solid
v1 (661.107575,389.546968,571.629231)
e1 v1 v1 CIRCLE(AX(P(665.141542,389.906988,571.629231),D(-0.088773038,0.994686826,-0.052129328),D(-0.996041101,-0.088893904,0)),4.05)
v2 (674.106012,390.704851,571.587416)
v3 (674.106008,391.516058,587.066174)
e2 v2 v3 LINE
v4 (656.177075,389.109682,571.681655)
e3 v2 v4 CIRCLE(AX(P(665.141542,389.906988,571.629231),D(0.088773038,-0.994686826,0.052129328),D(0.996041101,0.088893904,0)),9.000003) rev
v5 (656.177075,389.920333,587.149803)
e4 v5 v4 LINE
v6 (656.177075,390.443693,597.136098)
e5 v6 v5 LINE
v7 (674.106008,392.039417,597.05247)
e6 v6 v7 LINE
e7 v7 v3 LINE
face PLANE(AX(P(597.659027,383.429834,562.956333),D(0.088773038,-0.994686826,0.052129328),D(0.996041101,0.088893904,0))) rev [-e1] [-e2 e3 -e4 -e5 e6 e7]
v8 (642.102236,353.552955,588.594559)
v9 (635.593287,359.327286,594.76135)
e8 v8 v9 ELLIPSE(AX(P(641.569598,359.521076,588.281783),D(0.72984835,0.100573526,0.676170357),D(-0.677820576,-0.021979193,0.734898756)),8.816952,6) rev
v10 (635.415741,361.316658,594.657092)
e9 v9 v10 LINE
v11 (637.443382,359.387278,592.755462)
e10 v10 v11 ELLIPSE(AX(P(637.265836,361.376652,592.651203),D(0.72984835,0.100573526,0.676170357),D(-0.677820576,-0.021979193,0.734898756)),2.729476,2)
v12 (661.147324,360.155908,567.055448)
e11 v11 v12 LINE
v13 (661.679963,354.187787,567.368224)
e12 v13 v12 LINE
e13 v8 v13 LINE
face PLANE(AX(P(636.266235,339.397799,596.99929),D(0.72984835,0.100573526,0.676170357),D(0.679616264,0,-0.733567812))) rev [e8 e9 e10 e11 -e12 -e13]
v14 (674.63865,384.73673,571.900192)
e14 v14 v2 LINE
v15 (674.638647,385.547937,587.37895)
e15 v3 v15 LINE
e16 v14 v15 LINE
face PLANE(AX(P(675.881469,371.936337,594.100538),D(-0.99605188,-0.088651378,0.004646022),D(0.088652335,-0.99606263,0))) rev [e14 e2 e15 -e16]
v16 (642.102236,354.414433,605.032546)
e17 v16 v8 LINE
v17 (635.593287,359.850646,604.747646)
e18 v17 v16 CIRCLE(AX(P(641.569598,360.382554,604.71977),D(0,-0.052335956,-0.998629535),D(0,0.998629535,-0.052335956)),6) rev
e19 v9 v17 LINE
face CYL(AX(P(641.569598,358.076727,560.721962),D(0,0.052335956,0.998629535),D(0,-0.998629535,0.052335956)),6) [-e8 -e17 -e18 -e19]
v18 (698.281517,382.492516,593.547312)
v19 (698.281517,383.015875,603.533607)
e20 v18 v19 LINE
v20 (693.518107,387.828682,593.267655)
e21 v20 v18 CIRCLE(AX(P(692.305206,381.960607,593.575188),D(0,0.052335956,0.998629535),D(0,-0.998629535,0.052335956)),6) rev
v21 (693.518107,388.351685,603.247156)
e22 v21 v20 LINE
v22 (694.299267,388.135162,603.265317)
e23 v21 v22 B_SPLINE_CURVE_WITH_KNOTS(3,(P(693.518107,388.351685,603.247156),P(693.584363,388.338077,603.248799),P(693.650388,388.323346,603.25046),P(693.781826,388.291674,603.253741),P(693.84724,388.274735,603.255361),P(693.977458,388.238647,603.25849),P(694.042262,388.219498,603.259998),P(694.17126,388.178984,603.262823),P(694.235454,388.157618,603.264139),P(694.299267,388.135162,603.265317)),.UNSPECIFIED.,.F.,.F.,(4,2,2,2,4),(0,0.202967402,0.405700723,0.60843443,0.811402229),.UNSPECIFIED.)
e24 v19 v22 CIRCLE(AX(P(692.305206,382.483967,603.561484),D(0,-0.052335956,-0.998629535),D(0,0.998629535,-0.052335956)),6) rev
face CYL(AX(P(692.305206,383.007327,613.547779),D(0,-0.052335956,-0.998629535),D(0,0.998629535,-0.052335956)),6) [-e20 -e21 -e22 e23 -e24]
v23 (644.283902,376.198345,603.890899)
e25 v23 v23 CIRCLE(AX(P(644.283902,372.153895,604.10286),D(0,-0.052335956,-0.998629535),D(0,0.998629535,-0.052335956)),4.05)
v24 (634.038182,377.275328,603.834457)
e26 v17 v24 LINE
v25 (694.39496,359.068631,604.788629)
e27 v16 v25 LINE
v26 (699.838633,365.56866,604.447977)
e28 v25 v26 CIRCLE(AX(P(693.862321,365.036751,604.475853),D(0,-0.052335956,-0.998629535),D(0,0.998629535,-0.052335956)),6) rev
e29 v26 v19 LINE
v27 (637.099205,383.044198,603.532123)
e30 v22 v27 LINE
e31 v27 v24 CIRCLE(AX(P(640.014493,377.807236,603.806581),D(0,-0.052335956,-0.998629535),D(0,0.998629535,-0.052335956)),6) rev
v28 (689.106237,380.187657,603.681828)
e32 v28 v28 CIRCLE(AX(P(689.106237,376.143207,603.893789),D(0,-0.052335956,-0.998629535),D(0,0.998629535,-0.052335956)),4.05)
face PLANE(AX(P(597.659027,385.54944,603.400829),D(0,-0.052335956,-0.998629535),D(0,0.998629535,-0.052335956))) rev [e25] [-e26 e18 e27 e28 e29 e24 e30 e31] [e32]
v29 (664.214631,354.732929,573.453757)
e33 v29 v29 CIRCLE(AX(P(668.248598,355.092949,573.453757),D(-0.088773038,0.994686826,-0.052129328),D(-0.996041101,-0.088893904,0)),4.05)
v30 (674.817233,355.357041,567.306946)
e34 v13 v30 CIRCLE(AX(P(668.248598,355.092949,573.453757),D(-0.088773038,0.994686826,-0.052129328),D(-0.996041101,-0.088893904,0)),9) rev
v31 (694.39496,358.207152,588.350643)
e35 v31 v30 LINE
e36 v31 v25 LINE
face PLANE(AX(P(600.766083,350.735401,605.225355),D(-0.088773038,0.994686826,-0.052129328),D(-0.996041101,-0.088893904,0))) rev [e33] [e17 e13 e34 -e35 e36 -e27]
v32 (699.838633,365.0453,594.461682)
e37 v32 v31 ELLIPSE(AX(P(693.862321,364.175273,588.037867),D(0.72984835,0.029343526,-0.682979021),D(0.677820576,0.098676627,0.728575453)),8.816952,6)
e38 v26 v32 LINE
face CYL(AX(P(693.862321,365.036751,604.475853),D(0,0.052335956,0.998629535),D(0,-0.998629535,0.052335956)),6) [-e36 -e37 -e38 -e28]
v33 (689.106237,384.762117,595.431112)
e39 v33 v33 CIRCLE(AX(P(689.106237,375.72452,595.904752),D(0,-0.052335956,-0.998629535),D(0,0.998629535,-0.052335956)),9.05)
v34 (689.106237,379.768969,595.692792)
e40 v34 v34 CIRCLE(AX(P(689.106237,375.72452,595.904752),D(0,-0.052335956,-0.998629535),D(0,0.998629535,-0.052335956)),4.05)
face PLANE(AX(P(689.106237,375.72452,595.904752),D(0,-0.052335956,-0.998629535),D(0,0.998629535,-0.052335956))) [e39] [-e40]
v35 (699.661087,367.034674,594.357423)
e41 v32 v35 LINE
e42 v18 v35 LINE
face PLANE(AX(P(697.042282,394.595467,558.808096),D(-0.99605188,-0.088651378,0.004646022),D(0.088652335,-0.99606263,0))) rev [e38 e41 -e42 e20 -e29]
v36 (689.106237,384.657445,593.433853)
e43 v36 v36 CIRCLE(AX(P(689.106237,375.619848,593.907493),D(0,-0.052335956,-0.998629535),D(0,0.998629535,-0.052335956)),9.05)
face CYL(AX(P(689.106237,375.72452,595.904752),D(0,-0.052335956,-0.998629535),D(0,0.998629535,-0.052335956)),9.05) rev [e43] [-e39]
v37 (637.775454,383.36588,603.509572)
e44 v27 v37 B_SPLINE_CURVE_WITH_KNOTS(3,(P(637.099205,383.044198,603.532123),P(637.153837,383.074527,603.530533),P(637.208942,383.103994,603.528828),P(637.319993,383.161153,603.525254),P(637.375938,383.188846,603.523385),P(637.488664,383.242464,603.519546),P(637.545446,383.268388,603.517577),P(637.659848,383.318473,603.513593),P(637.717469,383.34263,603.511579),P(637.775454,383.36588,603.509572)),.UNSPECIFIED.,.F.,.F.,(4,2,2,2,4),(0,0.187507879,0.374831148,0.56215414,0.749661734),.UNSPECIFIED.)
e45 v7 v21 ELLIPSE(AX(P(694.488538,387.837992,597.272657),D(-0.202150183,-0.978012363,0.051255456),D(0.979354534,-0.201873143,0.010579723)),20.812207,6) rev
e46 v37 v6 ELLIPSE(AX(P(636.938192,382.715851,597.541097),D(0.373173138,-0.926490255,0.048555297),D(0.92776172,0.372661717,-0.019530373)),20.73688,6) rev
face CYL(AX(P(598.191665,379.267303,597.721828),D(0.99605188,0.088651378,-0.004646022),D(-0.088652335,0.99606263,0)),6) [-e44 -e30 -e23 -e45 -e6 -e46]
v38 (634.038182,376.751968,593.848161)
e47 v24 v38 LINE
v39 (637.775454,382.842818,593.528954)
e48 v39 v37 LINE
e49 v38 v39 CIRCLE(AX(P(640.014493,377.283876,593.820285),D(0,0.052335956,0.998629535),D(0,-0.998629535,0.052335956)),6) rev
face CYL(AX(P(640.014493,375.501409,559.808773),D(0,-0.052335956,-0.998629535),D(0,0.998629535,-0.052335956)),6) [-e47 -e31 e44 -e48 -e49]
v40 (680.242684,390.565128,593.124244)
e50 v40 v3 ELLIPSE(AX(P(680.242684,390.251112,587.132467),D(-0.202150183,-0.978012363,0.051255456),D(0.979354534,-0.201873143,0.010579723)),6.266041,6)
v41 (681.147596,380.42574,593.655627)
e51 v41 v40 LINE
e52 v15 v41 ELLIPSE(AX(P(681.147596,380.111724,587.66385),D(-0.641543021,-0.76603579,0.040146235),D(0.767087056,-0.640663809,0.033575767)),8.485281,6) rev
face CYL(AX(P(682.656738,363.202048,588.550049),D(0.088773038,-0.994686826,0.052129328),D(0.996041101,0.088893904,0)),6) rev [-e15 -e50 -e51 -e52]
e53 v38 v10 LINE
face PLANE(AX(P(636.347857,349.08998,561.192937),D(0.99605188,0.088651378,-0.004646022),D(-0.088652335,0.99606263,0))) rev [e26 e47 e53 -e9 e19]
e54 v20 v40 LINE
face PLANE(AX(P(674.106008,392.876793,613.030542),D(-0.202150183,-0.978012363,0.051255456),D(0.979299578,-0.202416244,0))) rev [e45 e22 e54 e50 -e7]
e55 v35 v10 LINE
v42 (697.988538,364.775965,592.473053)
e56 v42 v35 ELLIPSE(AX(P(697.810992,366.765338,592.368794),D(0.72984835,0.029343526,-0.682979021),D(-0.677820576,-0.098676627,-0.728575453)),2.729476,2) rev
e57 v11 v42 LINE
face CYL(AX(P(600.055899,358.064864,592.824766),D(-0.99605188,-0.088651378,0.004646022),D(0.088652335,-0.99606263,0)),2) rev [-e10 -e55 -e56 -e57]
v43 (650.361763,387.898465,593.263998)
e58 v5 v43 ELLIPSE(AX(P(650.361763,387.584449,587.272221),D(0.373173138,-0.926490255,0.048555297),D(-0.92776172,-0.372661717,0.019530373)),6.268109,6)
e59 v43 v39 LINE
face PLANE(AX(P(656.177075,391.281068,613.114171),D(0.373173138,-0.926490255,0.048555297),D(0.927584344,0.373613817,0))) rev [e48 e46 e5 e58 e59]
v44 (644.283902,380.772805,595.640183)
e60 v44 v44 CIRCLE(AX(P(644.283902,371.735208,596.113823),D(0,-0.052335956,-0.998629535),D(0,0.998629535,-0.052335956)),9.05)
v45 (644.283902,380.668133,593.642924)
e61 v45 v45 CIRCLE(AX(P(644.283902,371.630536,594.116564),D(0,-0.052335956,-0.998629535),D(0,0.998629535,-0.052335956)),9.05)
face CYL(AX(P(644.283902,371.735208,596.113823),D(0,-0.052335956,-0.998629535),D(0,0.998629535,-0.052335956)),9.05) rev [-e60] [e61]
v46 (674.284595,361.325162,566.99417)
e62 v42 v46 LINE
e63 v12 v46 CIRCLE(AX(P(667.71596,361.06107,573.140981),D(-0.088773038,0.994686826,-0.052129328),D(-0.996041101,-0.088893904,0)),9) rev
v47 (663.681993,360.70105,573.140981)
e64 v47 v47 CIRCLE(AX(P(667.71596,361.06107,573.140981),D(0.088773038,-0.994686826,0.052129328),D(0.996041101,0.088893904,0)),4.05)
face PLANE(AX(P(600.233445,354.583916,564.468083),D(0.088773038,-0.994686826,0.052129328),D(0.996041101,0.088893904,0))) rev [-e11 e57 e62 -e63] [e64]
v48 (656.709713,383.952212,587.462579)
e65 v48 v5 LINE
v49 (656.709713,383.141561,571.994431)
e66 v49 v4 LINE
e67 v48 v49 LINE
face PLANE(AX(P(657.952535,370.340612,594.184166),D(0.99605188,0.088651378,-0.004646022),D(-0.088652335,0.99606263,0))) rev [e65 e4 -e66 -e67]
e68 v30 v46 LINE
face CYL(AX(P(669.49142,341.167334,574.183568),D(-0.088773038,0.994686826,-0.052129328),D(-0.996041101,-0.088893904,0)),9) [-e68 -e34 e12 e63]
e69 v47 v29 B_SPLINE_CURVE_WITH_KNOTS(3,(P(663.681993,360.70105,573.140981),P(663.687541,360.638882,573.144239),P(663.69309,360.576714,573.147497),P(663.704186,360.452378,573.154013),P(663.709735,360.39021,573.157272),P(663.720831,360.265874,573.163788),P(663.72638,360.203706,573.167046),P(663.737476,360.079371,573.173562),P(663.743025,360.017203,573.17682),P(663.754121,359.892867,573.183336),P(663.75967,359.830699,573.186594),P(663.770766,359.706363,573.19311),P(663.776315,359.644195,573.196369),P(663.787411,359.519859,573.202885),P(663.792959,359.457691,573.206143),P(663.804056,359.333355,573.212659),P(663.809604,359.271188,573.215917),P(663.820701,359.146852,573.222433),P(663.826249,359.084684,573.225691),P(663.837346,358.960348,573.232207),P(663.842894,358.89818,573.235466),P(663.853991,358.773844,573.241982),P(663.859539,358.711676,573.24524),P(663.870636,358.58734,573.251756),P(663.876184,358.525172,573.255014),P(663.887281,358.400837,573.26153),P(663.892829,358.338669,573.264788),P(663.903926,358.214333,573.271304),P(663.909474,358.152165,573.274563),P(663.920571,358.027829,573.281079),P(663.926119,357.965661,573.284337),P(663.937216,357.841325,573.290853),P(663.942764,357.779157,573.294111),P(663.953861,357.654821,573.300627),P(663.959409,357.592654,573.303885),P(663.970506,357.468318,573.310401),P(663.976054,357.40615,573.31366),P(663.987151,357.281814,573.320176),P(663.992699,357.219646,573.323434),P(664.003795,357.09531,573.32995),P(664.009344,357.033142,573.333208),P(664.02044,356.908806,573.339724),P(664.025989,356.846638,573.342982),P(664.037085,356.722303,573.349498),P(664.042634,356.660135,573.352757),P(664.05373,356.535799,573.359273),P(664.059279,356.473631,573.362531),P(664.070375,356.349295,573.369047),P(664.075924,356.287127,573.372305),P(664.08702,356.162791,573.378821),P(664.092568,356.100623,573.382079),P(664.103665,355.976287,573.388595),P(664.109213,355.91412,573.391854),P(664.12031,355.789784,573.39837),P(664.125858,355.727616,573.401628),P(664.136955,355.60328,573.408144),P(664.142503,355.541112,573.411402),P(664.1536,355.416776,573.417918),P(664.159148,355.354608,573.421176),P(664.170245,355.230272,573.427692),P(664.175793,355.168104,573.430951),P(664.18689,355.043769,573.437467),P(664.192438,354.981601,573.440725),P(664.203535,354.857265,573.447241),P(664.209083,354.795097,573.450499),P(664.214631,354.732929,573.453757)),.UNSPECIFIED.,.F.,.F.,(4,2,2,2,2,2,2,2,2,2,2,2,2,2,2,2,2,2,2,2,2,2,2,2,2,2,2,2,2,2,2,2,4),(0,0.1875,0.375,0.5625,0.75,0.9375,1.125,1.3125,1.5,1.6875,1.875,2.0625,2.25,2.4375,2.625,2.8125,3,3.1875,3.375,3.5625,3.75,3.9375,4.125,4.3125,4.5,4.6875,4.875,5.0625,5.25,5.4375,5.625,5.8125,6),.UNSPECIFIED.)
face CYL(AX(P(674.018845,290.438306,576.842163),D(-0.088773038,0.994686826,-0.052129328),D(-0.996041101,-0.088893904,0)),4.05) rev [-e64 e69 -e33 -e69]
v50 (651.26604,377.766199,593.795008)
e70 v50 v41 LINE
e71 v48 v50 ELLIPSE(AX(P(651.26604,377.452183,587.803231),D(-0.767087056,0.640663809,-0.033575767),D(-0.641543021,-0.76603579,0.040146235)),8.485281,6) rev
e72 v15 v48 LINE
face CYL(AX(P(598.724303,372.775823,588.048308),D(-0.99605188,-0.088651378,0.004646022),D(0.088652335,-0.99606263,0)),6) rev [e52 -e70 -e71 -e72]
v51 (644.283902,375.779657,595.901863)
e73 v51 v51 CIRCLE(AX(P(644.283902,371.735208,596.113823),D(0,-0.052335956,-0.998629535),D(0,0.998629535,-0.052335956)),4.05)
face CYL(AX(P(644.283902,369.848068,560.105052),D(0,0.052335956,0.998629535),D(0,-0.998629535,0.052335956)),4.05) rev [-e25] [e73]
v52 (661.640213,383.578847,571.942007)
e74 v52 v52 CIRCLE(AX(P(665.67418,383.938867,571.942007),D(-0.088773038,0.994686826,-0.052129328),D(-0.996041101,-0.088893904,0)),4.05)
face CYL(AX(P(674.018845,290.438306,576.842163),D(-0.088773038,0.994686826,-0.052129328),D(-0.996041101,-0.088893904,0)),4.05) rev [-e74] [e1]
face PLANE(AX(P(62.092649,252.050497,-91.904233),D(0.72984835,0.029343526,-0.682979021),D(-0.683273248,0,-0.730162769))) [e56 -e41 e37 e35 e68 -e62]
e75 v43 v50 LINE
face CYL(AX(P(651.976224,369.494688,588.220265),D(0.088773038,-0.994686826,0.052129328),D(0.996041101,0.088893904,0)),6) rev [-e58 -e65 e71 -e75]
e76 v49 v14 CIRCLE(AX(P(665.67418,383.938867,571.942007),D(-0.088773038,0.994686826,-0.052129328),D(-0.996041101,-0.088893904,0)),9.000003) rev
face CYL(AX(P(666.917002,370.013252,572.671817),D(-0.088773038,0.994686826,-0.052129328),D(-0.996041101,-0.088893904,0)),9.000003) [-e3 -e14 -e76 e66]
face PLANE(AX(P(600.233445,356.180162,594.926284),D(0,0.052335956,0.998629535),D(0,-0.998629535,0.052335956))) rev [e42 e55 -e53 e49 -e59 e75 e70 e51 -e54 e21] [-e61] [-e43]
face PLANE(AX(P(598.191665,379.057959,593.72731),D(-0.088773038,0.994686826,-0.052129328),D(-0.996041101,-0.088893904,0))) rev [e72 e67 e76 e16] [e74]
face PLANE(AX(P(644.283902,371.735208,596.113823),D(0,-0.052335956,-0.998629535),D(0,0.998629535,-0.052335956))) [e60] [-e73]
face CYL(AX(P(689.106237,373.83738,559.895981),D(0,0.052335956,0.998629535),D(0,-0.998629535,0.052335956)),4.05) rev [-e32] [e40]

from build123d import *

# Parameters (mm, degrees)
SKETCH_2_R          = 4.050000000000024
EXTRUDE_1_DEPTH     = 50
CUT_EXTRUDE_1_DEPTH = 100
CUT_EXTRUDE_2_DEPTH = 100
SKETCH_7_R          = 4.050000000000008
CUT_EXTRUDE_3_DEPTH = 100
CUT_EXTRUDE_6_DEPTH = 20
CUT_EXTRUDE_7_DEPTH = 20
CUT_EXTRUDE_8_DEPTH = 20
FILLET_1_R          = 6
FILLET_2_R          = 2
FILLET_3_R          = 6
FILLET_4_R          = 6
SKETCH_13_R         = 9.049999999999946
CUT_EXTRUDE_9_DEPTH = 2


with BuildPart() as part:
    # ｽｹｯﾁ2 → ﾎﾞｽ - 押し出し1 (new body)
    with BuildSketch(Plane(origin=(-3.9916e-13, 32.90329120575703, 627.8321969731651), x_dir=(-1, -3e-17, -6.3e-16), z_dir=(0, -0.05233595624294474, -0.9986295347545739))):
        Polygon((-697.0422820628135, 364.8089319187604), (-700.5932035956617, 324.9668567184454), (-636.3478573351539, 319.2409957467275), (-632.7969358023056, 359.08307094704253), align=None)
        with Locations(Location((-644.2839023988065, 340.0275704705168, 0), (0, 0, 90))):
            Circle(SKETCH_2_R, mode=Mode.SUBTRACT)
        with Locations(Location((-689.106236999161, 344.02235719497116, 0), (0, 0, 90))):
            Circle(SKETCH_2_R, mode=Mode.SUBTRACT)
    extrude(amount=EXTRUDE_1_DEPTH)

    # ｽｹｯﾁ5 → ｶｯﾄ - 押し出し1 (cut)
    with BuildSketch(Plane(origin=(723.8064708248907, 64.42078199043551, -3.3761501237952602), x_dir=(-0.004627728743617884, -0.0004118806842991107, -0.9999892071822463), z_dir=(0.9960518800078746, 0.08865137795745748, -0.004646021849131346))):
        Polygon((-608.1434669406992, 296.09511014614947), (-567.6985342683519, 293.98384959158335), (-567.3857549269345, 299.9756914689684), (-597.8442844703076, 301.56565312117255), (-596.645296994875, 324.5343803178144), (-566.186767451502, 322.9444186656103), (-565.8739881100848, 328.9362605429951), (-606.3189207824322, 331.0475210975612), (-626.0453368448235, 332.0772571204365), (-625.4050029902406, 344.3439854408341), (-551.5560275003857, 340.4890048871531), (-554.6576307812425, 281.07230447123857), (-628.5066062710979, 284.92728502491957), (-628.5066062710974, 296.97977053027586), align=None)
    extrude(amount=-CUT_EXTRUDE_1_DEPTH, mode=Mode.SUBTRACT)

    # ｽｹｯﾁ6 → ｶｯﾄ - 押し出し2 (cut)
    with BuildSketch(Plane(origin=(723.8064708248907, 64.42078199043551, -3.3761501237952602), x_dir=(-0.004627728743617884, -0.0004118806842991107, -0.9999892071822463), z_dir=(0.9960518800078746, 0.08865137795745748, -0.004646021849131346))):
        Polygon((-606.3189207824322, 331.04752109756123), (-608.1434669406992, 296.0951101461494), (-619.732969083748, 290.9532658931082), (-617.724208131906, 336.87839675393917), align=None)
    extrude(amount=-CUT_EXTRUDE_2_DEPTH, mode=Mode.SUBTRACT)

    # ｽｹｯﾁ7 → ｶｯﾄ - 押し出し3 (cut)
    with BuildSketch(Plane(origin=(-26.542256166274278, 297.4014749020998, -15.586150855120477), x_dir=(0.9960518800078747, 0.0886513779574575, -0.004646021849131969), z_dir=(-0.0887730383212076, 0.9946868255236824, -0.05212932760779488))):
        with Locations(Location((694.4254727867873, -591.2519877036084, 0), (0, 0, 179.733439165))):
            Circle(SKETCH_7_R)
    extrude(amount=-CUT_EXTRUDE_3_DEPTH, mode=Mode.SUBTRACT)

    # ｽｹｯﾁ8 → ｶｯﾄ - 押し出し6 (cut)
    with BuildSketch(Plane(origin=(-26.542256166274278, 297.4014749020998, -15.586150855120477), x_dir=(0.9960518800078747, 0.0886513779574575, -0.004646021849131969), z_dir=(-0.0887730383212076, 0.9946868255236824, -0.05212932760779488))):
        with BuildLine():
            Line((653.0837968072778, -612.7519877036083), (685.4254727867873, -612.7519877036083))
            Line((685.4254727867873, -612.7519877036083), (685.4254727867873, -591.2626120432828))
            ThreePointArc((685.4254727867873, -591.2626120432828), (694.420160616025, -582.2519830004186), (703.4254727867874, -591.2519877036085))
            Line((703.4254727867874, -591.2519877036085), (703.4254727867874, -612.7519877036083))
            Line((703.4254727867874, -612.7519877036083), (732.6544524188718, -612.7519877036083))
            Line((732.6544524188718, -612.7519877036083), (732.6544524188718, -571.4472878962366))
            Line((732.6544524188718, -571.4472878962366), (653.0837968072778, -571.4472878962366))
            Line((653.0837968072778, -571.4472878962366), (653.0837968072778, -612.7519877036083))
        make_face()
    extrude(amount=-CUT_EXTRUDE_6_DEPTH, mode=Mode.SUBTRACT)

    # ｽｹｯﾁ9 → ｶｯﾄ - 押し出し7 (cut)
    with BuildSketch(Plane(origin=(-23.96783805495928, 268.5555569619133, -14.074400354494276), x_dir=(0.9960518800078746, 0.08865137795745749, -0.0046460218491326), z_dir=(-0.08877303832120763, 0.994686825523682, -0.052129327607802006))):
        with BuildLine():
            Line((701.0201444957777, -585.1274220005872), (726.6754727867866, -612.7519877036101))
            Line((726.6754727867866, -612.7519877036101), (726.6754727867866, -582.25198770361))
            Line((726.6754727867866, -582.25198770361), (694.4254732410474, -582.25198770361))
            ThreePointArc((694.4254732410474, -582.2519877036095), (698.0226182987518, -583.0021062398702), (701.0201444957777, -585.1274220005872))
        make_face()
        with BuildLine():
            ThreePointArc((687.8308010777955, -585.1274220005871), (690.8283276912211, -583.0021060583099), (694.4254732410474, -582.2519877036095))
            Line((694.4254732410474, -582.25198770361), (662.1754727867867, -582.25198770361))
            Line((662.1754727867867, -582.25198770361), (662.1754727867866, -612.7519877036101))
            Line((662.1754727867866, -612.7519877036101), (687.8308010777955, -585.1274220005871))
        make_face()
    extrude(amount=-CUT_EXTRUDE_7_DEPTH, mode=Mode.SUBTRACT)

    # ｽｹｯﾁ10 → ｶｯﾄ - 押し出し8 (cut)
    with BuildSketch(Plane(origin=(-4.2186e-13, 32.06896121623387, 611.9122324003949), x_dir=(-1, -4e-17, -7.1e-16), z_dir=(0, -0.05233595624294566, -0.9986295347545738))):
        Polygon((-674.1060084484338, 360.25482907777223), (-697.885625926865, 355.3464390586851), (-697.2642146586165, 362.31880221874025), align=None)
        Polygon((-656.177074608292, 358.65691438799047), (-633.6427427973452, 349.59294124702217), (-633.0188683981086, 356.5929412470222), align=None)
    extrude(amount=-CUT_EXTRUDE_8_DEPTH, mode=Mode.SUBTRACT)

    # ﾌｨﾚｯﾄ1
    fillet_1_edges = [part.edges().sort_by_distance(p)[0] for p in [
        (700.3712709998582, 359.33885899665444, 599.767605561525),
        (636.1259247393505, 353.62084511839845, 600.0672739707941),
        (697.8856259268646, 387.19009011131783, 598.3079843885063),
        (633.6427427973448, 381.4444772684454, 598.6090991982213),
    ]]
    fillet(fillet_1_edges, radius=FILLET_1_R)

    # ﾌｨﾚｯﾄ2
    # the kernel refuses this fillet: 2 mm, written as the material it adds along each edge
    with BuildSketch(Plane(origin=(699.838632769931, 365.045300168582, 594.461681922105), x_dir=(-0.08877303832120755, 0.9946868255236814, -0.052129327607815884), z_dir=(-0.9960518800078746, -0.08865137795745748, 0.004646021849131346))) as fillet_2_piece_1_section:
        with BuildLine():
            CenterArc((FILLET_2_R, FILLET_2_R), FILLET_2_R, 180.00000000000324, 89.99999999999625)
            Line((2.78e-15, FILLET_2_R), (0, 0))
            Line((0, 0), (FILLET_2_R, 0))
        make_face()
    fillet_2_piece_1 = extrude(amount=64.49999999999983, mode=Mode.PRIVATE)
    fillet_2_piece_1 = split(fillet_2_piece_1, bisect_by=Plane(origin=(684.700257312396, 363.3009068359351, 578.2094916382387), z_dir=(-0.7298483504195092, -0.029343525726524503, 0.6829790208255727)), keep=Keep.TOP, mode=Mode.PRIVATE)
    fillet_2_piece_1 = split(fillet_2_piece_1, bisect_by=Plane(origin=(650.6507062336964, 360.2704024189458, 578.3683136457086), z_dir=(0.7298483504195105, 0.10057352631328549, 0.6761703566371646)), keep=Keep.TOP, mode=Mode.PRIVATE)
    add(fillet_2_piece_1)

    # ﾌｨﾚｯﾄ3
    fillet_3_edges = [part.edges().sort_by_distance(p)[0] for p in [
        (665.1415415283625, 391.55557073207024, 603.0860609736587),
    ]]
    fillet(fillet_3_edges, radius=FILLET_3_R)

    # ﾌｨﾚｯﾄ4
    fillet_4_edges = [part.edges().sort_by_distance(p)[0] for p in [
        (665.6741797582897, 385.06409021649864, 593.4125415917601),
        (656.4433937232551, 387.2502882914526, 593.2979678055787),
        (674.372327563397, 388.84601309468684, 593.2143394122943),
    ]]
    fillet(fillet_4_edges, radius=FILLET_4_R)

    # ｽｹｯﾁ13 → ｶｯﾄ - 押し出し9 (cut)
    with BuildSketch(Plane(origin=(-4.2186e-13, 32.06896121623387, 611.9122324003949), x_dir=(-1, -4e-17, -7e-16), z_dir=(0, -0.05233595624294553, -0.9986295347545739))):
        with Locations(Location((-689.106236999161, 344.02235719497077, 0), (0, 0, 90))):
            Circle(SKETCH_13_R)
        with Locations(Location((-644.2839023988065, 340.02757047051637, 0), (0, 0, 90))):
            Circle(SKETCH_13_R)
    extrude(amount=-CUT_EXTRUDE_9_DEPTH, mode=Mode.SUBTRACT)


solid = part.part
